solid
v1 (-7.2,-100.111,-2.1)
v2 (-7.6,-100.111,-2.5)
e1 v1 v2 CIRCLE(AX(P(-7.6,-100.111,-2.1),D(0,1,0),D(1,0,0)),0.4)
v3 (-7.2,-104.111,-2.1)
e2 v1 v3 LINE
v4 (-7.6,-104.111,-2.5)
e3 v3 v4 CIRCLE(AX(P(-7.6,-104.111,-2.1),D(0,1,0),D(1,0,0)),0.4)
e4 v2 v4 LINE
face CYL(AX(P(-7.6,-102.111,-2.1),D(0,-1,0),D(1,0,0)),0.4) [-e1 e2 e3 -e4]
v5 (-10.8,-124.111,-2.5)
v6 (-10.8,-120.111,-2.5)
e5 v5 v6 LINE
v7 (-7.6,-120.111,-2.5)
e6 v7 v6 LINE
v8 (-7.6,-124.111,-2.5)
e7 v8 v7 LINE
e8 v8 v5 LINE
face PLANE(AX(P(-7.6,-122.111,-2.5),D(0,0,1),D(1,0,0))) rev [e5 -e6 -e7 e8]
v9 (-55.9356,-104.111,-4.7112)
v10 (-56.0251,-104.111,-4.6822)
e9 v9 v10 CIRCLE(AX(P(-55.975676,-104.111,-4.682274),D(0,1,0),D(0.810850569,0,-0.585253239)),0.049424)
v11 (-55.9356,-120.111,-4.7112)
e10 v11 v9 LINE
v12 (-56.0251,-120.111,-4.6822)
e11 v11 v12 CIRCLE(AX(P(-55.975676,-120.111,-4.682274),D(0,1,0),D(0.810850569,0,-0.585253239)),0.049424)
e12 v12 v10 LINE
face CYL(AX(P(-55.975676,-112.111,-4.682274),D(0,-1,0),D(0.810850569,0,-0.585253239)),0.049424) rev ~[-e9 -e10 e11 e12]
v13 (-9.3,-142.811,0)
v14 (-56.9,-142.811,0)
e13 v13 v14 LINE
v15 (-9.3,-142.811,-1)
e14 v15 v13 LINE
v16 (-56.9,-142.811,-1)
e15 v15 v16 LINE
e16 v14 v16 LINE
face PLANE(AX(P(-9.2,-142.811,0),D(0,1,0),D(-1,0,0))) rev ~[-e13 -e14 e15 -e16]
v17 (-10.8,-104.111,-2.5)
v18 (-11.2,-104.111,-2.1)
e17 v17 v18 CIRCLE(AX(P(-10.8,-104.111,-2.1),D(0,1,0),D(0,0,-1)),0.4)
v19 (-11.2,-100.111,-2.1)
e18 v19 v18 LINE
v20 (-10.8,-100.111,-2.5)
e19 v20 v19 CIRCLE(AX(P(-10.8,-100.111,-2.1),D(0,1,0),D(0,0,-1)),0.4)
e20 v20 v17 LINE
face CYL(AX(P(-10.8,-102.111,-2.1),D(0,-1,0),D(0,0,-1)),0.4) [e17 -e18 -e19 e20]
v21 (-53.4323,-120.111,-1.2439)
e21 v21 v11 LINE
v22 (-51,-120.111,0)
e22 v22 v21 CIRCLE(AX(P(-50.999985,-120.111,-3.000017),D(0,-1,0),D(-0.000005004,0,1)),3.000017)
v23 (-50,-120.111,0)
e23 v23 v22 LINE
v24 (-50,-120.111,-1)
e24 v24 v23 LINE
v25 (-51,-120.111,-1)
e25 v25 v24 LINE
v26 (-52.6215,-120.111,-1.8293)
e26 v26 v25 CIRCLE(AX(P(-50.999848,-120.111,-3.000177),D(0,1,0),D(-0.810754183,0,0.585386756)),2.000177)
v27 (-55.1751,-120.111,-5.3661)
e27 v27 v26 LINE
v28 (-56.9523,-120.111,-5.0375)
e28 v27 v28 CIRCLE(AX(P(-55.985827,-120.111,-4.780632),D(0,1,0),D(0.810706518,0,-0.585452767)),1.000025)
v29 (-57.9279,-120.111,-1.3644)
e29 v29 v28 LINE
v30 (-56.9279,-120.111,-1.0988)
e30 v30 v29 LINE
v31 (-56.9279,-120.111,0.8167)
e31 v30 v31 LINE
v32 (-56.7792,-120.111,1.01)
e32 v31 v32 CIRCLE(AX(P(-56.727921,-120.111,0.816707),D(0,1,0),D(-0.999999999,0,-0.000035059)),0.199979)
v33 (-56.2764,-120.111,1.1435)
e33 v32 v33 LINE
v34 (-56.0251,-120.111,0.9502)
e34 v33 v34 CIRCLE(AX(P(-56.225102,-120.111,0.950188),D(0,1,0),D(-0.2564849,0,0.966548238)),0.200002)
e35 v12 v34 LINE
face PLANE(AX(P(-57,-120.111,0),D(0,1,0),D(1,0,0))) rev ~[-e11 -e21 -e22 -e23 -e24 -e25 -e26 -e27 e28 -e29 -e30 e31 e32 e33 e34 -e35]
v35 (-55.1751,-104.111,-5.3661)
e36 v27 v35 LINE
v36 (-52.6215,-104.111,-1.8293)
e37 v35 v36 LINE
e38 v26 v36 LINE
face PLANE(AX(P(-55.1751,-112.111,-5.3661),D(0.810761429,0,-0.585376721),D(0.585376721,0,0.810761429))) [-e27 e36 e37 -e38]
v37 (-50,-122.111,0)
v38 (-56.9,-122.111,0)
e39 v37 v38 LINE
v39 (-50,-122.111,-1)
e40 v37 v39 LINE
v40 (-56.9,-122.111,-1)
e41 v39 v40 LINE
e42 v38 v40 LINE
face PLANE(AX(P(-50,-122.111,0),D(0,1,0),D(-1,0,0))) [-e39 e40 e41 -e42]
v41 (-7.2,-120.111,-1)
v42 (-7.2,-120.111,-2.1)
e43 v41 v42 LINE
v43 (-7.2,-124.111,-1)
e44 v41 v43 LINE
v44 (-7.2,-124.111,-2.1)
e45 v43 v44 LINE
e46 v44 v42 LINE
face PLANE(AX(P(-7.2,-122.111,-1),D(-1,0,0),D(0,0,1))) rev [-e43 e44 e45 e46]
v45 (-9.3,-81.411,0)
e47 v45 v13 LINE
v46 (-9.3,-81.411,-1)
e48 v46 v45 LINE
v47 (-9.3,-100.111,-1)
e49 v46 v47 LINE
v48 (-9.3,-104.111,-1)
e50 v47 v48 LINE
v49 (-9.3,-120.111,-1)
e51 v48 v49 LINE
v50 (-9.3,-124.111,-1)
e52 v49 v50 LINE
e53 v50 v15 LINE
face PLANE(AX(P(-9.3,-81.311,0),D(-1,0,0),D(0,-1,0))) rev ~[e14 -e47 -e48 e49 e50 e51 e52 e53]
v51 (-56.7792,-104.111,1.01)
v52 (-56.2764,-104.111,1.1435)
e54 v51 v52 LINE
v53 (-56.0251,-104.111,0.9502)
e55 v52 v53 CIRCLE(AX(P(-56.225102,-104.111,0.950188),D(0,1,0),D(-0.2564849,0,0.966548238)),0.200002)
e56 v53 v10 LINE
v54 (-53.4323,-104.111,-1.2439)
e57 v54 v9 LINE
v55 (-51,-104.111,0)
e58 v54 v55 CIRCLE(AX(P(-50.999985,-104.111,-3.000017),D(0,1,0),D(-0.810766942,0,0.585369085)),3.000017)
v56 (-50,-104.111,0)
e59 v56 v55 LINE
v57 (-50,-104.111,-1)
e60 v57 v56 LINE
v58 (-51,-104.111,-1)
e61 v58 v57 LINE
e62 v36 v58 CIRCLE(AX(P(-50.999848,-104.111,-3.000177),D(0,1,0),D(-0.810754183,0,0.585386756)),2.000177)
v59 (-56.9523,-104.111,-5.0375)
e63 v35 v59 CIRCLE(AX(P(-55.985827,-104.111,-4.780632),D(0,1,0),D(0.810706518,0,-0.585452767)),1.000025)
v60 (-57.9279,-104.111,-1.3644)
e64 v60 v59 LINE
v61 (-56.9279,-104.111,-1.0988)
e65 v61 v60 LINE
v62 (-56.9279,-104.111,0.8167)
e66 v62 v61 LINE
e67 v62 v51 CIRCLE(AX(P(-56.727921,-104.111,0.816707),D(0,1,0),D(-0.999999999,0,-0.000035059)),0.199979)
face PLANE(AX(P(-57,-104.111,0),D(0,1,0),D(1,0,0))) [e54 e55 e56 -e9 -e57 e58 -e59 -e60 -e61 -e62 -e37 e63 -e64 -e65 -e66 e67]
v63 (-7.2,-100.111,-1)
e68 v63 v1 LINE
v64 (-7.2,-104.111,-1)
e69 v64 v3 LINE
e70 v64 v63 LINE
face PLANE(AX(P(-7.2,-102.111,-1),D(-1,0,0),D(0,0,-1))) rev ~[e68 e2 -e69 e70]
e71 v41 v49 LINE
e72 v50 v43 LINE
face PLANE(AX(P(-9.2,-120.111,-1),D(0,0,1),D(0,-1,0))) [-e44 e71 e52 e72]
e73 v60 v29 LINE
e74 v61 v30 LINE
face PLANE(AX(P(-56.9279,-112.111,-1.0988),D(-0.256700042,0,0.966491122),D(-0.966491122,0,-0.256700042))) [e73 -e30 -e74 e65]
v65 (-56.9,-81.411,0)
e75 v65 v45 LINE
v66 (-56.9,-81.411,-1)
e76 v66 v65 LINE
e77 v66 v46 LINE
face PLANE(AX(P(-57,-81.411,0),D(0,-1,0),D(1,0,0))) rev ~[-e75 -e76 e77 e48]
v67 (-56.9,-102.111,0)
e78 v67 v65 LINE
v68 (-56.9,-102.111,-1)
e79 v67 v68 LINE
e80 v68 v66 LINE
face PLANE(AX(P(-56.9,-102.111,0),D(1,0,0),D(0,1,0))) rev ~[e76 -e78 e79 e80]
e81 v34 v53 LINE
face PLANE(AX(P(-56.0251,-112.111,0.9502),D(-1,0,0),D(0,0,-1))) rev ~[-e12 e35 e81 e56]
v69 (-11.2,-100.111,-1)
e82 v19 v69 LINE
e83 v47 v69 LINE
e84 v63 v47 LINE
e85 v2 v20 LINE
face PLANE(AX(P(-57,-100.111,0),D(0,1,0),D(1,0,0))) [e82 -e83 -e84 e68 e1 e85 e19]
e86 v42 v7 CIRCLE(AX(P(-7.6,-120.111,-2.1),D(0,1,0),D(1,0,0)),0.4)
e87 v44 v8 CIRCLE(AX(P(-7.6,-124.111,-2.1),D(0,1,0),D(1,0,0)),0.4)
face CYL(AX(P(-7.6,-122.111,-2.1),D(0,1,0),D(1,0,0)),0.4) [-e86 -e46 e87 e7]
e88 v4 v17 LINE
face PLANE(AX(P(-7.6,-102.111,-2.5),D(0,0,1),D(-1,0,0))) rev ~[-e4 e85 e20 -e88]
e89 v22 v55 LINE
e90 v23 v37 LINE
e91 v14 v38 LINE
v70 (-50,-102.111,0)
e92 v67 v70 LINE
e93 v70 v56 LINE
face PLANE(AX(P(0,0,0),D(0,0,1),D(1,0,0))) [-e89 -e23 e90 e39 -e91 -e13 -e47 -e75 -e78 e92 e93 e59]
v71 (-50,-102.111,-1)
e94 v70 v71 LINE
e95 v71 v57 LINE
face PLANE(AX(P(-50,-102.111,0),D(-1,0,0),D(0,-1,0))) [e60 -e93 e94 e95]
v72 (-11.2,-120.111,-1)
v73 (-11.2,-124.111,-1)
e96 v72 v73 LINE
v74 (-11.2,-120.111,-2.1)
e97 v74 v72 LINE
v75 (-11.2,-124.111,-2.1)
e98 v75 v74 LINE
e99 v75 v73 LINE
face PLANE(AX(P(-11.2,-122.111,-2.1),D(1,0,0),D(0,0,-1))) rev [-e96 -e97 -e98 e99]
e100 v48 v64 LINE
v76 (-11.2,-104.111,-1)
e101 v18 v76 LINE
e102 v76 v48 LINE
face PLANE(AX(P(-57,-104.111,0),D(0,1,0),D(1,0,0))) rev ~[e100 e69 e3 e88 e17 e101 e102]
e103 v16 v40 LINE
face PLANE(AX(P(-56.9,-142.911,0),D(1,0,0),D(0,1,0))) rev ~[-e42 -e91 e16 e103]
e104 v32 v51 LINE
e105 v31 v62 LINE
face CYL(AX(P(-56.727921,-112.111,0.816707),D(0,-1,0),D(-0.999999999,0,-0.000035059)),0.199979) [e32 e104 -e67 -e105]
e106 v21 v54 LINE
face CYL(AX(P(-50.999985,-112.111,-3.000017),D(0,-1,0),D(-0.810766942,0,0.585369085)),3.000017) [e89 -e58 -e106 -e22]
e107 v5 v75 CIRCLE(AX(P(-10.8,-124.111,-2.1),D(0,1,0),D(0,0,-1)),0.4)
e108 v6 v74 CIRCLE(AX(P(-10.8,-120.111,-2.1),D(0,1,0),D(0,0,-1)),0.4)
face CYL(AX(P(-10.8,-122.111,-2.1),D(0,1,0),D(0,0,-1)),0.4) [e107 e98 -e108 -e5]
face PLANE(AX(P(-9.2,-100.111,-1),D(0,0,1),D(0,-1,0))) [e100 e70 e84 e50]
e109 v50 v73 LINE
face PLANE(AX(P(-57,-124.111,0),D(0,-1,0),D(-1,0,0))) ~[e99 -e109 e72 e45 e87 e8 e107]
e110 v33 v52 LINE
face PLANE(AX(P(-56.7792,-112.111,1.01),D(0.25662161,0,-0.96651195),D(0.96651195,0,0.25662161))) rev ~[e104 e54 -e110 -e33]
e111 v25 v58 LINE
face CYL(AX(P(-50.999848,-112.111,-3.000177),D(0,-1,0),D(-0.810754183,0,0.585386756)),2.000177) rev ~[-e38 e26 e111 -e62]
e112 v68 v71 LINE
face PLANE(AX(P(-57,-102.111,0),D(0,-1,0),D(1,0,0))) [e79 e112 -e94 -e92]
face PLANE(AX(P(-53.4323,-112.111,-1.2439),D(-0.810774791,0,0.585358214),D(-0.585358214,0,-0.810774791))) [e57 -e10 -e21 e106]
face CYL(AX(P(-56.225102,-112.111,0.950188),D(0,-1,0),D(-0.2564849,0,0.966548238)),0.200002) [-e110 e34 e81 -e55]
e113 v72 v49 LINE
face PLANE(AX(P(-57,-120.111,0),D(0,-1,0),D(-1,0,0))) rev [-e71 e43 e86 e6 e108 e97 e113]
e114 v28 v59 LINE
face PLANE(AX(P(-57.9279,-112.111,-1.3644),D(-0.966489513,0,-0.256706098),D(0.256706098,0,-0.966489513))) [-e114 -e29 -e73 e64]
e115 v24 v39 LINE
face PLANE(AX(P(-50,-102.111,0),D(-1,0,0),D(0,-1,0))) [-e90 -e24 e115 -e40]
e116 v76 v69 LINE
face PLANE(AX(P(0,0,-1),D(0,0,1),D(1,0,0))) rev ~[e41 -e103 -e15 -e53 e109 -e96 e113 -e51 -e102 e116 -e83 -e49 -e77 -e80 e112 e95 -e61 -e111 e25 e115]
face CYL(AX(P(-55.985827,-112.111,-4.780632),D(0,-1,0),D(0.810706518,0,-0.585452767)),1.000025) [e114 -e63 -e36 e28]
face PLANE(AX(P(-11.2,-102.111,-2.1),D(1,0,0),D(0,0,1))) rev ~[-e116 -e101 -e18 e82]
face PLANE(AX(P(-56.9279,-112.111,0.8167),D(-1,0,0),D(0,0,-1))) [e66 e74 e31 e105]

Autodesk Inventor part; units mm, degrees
ref_plane "YZ Plane" through (0, 0, 0) normal (1, 0, 0) x (0, 1, 0)
ref_plane "Work Plane1" through (0, 0, 0) normal (0, 0, 1) x (1, 0, 0)
sketch "Sketch1" plane through (0, 0, 0) normal (0, 0, 1) x (1, 0, 0)
  line L0 (-60, -72.111) -> (-60, -152.111) construction
  line L1 (0, -152.111) -> (-60, -152.111) construction
  line L2 (0, -72.111) -> (0, -152.111) construction
  line L3 (-57, -81.311) -> (-9.2, -81.311)
  line L4 (-9.2, -81.311) -> (-9.2, -142.911)
  line L5 (-9.2, -142.911) -> (-57, -142.911)
  line L6 (-57, -142.911) -> (-57, -81.311)
  line L7 (-57, -112.111) -> (-9.2, -112.111) construction
  line L8 (-57, -102.111) -> (-50, -102.111)
  line L9 (-50, -102.111) -> (-50, -122.111)
  line L10 (-50, -122.111) -> (-57, -122.111)
  line L11 (-57, -122.111) -> (-57, -102.111)
  line L12 (0, -72.111) -> (-60, -72.111) projected
  line L13 (-9.2, -81.311) -> (-57, -81.311) projected
  line L14 (-9.2, -142.911) -> (-9.2, -81.311) projected
  line L15 (-57, -142.911) -> (-9.2, -142.911) projected
  line L16 (-57, -81.311) -> (-57, -142.911) projected
  point P0 (0, 0)
  dimension "d0" = 20
  dimension "d1" = 7
extrude "Extrusion1" add sketch "Sketch1" against normal blind 1 contours L3 L4 L5 L6 L10 L9 L8
ref_plane "Work Plane2" through (-57, -112.111, 0) normal (0, 1, 0) x (1, 0, 0)
sketch "Sketch2" plane through (-57, -112.111, 0) normal (0, 1, 0) x (1, 0, 0)
  line L0 (7, 0) -> (0, 0) construction
  line L1 (7, 0) -> (7, 1) construction
  line L2 (0, 1) -> (7, 1) construction
  line L3 (0, 0) -> (0, 1) construction
  line L4 (0.0721, -0.8167) -> (0.0721, 1.0988)
  line L5 (0.0721, 1.0988) -> (-0.9279, 1.3644)
  line L6 (-0.9279, 1.3644) -> (0.0477, 5.0375)
  arc A0 (1.8249, 5.3661) -> (0.0477, 5.0375) centre (1.0142, 4.7807) ccw
  line L7 (1.8249, 5.3661) -> (4.3785, 1.8293)
  arc A1 (4.3785, 1.8293) -> (6, 1) centre (6, 3) ccw
  line L8 (6, 1) -> (7, 1)
  line L9 (7, 1) -> (7, 0)
  line L10 (7, 0) -> (6, 0)
  arc A2 (3.5677, 1.2439) -> (6, 0) centre (6, 3) ccw
  line L11 (3.5677, 1.2439) -> (1.0644, 4.7112)
  arc A3 (1.0644, 4.7112) -> (0.9749, 4.6822) centre (1.0243, 4.6822) ccw
  line L12 (47.8, 0) -> (0, 0) projected
  line L13 (47.8, 1) -> (0, 1) projected
  line L14 (6, 0) -> (6, 1) construction
  line L15 (0.9749, -0.9502) -> (0.9749, 4.6822)
  line L16 (0.2208, -1.01) -> (0.7236, -1.1435)
  arc A4 (0.7236, -1.1435) -> (0.9749, -0.9502) centre (0.7749, -0.9502) ccw
  arc A5 (0.0721, -0.8167) -> (0.2208, -1.01) centre (0.2721, -0.8167) ccw
  point P0 (57, 0)
  point P1 (0.9749, -1.2103)
  point P2 (0.0721, -0.9705)
  dimension "d8" = 1
  dimension "d9" = 1
  dimension "d11" = 1
  dimension "d12" = 0.0494
  dimension "d22" = 1
  dimension "d23" = 2
  dimension "d32" = 2
  dimension "d34" = 2.5
  dimension "d36" = 0.2
  dimension "d37" = 0.9874
  dimension "d38" = 1
  dimension "d39" = 125.829
  dimension "d40" = 3.8003
extrude "Extrusion2" add sketch "Sketch2" along normal mid plane 16 contours L4 L12 L15 A4 L16 A5 | L4 L13 L15 L12 | L4 L5 L6 A0 L7 A1 L13 A2 L11 A3 L15 | A2 L13 L8 L9 L10
ref_plane "Work Plane3" through (-57, -102.111, 0) normal (0, 1, 0) x (1, 0, 0)
sketch "Sketch4" plane through (-57, -102.111, 0) normal (0, 1, 0) x (1, 0, 0)
  line L0 (57, 0) -> (-3, 0) construction
  line L1 (0, 0) -> (47.8, 0) construction
  line L2 (47.8, 0) -> (47.8, 1) construction
  line L3 (0, 1) -> (47.8, 1) construction
  line L4 (0, 0) -> (0, 1) construction
  line L5 (0, 1) -> (47.8, 1) projected
  line L6 (45.8, 1) -> (47.8, 1)
  line L7 (47.8, 1) -> (49.8, 1)
  line L8 (49.8, 1) -> (49.8, 2.1)
  line L9 (49.4, 2.5) -> (46.2, 2.5)
  line L10 (45.8, 2.1) -> (45.8, 1)
  arc A0 (49.8, 2.1) -> (49.4, 2.5) centre (49.4, 2.1) ccw
  arc A1 (46.2, 2.5) -> (45.8, 2.1) centre (46.2, 2.1) ccw
  point P0 (49.8, 2.5)
  dimension "d25" = 1.5
  dimension "d26" = 2
  dimension "d27" = 2
  dimension "d28" = 0.4
extrude "Extrusion3" add sketch "Sketch4" along normal mid plane 4
mirror "Mirror1" about plane through (-57, -112.111, 0) normal (0, 1, 0) of "Extrusion3"
thicken "Thicken1" operation add thickness 0.1 both sides no extend neighbours yes toward (0, 1, 0) faces at (-25.1333, -142.911, -0.3333) (-57, -135.9777, -0.3333) (-9.2, -108.111, -0.3333) (-41.0667, -81.311, -0.3333) (-57, -95.1777, -0.3333)
equation "\"d8\" = d9"
properties part number "BAcA_3"
